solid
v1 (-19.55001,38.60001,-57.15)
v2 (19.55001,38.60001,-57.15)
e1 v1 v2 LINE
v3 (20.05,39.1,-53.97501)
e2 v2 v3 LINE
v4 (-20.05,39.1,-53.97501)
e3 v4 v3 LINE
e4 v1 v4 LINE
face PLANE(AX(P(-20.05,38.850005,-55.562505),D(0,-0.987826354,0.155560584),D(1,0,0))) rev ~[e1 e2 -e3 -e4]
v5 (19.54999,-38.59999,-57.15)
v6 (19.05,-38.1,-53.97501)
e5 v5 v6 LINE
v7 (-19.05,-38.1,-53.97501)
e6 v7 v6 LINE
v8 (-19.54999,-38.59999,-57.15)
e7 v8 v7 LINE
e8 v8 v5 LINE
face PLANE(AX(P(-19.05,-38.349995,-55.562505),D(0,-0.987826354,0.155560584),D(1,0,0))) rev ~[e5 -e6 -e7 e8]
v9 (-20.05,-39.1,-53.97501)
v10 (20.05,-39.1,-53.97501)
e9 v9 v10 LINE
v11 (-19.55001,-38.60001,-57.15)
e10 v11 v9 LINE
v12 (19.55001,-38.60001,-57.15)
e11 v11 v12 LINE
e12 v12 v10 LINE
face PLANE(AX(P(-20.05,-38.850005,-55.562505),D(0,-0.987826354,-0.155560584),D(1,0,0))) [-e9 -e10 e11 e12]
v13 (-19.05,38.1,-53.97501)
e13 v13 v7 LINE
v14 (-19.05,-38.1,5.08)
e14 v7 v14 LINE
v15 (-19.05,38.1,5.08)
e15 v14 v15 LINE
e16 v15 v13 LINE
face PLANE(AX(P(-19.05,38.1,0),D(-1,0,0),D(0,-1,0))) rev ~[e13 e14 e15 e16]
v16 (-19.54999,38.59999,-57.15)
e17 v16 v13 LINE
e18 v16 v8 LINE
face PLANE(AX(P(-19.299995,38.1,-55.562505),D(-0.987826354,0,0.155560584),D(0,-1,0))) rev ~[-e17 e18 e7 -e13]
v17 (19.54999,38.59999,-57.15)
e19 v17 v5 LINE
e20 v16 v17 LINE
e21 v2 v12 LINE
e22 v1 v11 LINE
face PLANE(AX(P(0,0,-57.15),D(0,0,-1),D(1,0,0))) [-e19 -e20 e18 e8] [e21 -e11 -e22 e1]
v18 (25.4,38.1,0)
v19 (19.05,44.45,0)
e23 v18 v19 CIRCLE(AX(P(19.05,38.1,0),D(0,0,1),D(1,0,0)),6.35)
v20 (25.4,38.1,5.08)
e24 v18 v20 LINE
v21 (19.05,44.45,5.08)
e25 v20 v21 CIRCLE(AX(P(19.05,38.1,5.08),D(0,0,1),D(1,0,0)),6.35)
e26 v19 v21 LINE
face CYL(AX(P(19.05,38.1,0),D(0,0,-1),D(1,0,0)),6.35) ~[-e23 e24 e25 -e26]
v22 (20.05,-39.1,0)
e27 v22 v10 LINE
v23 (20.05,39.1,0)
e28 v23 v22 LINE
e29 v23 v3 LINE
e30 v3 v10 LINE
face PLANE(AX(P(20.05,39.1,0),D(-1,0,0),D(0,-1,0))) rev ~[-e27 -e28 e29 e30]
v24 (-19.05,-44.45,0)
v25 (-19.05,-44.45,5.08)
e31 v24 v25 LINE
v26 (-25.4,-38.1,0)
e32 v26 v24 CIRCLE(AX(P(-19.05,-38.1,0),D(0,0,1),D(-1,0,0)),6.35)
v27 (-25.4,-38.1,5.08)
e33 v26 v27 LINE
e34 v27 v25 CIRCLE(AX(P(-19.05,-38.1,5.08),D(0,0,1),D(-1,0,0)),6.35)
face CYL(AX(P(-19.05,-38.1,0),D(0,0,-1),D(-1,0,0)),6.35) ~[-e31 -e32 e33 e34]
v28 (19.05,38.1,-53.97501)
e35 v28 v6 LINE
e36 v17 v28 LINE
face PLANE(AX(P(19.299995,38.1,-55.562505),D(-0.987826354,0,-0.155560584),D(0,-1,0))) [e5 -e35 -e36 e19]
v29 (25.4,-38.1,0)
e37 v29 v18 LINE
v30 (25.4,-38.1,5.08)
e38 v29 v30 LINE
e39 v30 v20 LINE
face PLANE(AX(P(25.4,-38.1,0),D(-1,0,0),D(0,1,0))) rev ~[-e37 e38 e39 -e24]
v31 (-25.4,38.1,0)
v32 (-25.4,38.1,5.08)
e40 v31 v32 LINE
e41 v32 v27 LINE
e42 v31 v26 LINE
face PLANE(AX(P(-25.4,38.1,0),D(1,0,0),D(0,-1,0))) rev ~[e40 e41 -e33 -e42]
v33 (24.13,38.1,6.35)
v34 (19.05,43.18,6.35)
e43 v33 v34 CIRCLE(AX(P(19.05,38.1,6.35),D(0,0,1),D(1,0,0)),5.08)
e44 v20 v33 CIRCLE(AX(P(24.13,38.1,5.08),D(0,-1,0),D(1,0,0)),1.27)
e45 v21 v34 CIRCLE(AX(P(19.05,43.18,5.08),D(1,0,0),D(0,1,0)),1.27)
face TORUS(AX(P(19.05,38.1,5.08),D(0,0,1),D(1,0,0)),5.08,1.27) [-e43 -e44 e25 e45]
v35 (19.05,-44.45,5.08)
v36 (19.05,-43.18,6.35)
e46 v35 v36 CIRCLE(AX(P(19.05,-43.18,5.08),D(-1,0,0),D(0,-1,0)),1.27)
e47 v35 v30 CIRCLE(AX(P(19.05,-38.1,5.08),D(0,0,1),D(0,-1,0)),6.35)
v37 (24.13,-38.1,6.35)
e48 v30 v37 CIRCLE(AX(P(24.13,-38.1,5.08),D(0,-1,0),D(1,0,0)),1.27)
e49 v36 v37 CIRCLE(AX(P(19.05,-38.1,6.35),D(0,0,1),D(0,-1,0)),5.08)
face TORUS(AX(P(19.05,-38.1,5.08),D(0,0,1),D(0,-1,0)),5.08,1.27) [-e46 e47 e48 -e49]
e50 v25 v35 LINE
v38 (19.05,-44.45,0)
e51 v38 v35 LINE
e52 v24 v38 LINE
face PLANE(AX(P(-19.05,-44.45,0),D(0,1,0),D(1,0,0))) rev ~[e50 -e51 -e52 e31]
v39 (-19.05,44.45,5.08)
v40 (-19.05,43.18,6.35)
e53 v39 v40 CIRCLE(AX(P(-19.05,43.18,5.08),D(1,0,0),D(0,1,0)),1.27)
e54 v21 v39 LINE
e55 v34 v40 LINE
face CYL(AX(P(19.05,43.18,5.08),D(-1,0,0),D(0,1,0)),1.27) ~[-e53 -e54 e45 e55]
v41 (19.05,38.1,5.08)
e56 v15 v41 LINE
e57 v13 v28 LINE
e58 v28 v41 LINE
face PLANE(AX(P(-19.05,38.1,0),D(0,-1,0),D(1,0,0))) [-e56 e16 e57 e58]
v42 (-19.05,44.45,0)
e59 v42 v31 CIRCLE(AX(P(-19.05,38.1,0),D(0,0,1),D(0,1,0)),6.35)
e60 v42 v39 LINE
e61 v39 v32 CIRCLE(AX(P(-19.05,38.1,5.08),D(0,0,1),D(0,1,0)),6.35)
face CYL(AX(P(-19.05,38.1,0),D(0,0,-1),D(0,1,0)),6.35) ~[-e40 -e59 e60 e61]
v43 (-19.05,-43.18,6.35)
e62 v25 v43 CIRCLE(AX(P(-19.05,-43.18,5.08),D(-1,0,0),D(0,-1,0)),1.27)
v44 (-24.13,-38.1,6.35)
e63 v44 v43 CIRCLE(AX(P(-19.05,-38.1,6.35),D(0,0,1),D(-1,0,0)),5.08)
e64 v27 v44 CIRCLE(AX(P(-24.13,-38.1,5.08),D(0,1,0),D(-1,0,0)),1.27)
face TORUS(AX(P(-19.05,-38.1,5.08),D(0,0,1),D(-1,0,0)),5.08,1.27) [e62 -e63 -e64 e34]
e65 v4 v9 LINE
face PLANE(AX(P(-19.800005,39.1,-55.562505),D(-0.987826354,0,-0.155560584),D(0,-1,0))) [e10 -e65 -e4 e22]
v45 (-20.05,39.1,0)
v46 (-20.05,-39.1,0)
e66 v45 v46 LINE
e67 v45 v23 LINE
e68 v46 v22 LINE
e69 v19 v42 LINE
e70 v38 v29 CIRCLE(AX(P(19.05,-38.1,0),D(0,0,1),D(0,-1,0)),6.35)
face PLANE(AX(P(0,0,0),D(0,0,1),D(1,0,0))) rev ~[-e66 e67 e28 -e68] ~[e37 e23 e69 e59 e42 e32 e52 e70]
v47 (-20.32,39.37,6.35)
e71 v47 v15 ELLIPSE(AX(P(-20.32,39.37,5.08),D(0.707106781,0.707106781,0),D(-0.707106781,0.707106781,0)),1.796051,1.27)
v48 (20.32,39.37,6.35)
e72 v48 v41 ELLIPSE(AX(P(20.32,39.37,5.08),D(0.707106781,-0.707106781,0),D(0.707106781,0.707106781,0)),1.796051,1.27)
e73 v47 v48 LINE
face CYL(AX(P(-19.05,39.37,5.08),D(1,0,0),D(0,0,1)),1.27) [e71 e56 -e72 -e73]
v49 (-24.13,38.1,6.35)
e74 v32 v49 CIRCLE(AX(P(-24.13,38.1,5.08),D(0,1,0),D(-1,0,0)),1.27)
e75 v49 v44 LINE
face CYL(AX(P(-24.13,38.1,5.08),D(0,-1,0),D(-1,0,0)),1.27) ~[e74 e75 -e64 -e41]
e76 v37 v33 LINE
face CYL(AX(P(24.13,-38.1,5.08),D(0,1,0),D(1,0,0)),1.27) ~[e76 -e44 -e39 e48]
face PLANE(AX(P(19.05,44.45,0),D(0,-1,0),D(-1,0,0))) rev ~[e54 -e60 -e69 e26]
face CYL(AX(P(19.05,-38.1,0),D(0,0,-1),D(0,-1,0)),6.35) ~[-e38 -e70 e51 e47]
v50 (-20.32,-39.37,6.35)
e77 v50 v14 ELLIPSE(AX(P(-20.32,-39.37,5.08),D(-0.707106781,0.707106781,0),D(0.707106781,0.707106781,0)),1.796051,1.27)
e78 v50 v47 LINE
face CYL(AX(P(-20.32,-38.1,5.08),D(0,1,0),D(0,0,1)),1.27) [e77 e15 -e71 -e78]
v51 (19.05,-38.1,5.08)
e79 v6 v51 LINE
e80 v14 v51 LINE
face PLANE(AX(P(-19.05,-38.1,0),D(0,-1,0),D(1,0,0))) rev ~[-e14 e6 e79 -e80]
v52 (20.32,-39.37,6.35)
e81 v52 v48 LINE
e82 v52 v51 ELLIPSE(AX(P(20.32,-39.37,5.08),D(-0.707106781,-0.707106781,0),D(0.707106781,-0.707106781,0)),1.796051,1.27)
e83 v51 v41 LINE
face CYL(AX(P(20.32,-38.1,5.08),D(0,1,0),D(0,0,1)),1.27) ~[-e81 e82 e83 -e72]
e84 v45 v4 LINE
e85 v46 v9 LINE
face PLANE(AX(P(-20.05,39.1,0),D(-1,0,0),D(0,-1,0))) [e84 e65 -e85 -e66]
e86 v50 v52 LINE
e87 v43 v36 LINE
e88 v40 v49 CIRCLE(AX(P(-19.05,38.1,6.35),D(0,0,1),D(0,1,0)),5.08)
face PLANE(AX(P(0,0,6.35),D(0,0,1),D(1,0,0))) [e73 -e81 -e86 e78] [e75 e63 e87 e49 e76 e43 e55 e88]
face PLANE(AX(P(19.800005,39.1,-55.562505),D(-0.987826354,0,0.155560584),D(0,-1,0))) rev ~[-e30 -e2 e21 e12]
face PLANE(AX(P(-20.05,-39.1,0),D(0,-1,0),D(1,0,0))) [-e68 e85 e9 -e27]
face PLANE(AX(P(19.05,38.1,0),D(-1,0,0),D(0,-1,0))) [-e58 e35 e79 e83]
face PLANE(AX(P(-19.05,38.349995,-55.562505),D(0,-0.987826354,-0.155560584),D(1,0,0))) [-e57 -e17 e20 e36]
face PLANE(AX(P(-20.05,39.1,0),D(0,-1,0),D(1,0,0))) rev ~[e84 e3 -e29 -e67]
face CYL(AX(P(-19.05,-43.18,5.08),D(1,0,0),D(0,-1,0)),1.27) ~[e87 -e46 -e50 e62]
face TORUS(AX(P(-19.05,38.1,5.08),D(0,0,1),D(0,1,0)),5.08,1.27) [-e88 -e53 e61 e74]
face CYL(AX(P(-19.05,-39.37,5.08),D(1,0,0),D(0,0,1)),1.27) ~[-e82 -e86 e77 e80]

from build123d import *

# Parameters (mm, degrees)
F0_W     = 40.1
F0_H     = 78.2
F0_W_2   = 38.1
F0_H_2   = 76.2
F1_DEPTH = 6.35
F2_W     = 40.1
F2_H     = 78.2
F2_W_2   = 38.1
F2_H_2   = 76.2
F3_DEPTH = 57.15
F4_SIZE2 = 3.17499
F4_SIZE  = 0.49999
F5_R     = 1.27


# Not quite as in the source:
# - a fillet or chamfer is up to 0.001 mm smaller than in the source, because OpenCascade refuses the exact size


with BuildPart() as f1:
    # F0 (on Top) → F1 (new body)
    with BuildSketch(Plane.XY):
        with BuildLine():
            ThreePointArc((25.4, 38.1), (23.5401280605, 42.5901280605), (19.05, 44.45))
            Line((19.05, 44.45), (-19.05, 44.45))
            ThreePointArc((-19.05, 44.45), (-23.5401280605, 42.5901280605), (-25.4, 38.1))
            Line((-25.4, 38.1), (-25.4, -38.1))
            ThreePointArc((-25.4, -38.1), (-23.5401280605, -42.5901280605), (-19.05, -44.45))
            Line((-19.05, -44.45), (19.05, -44.45))
            ThreePointArc((19.05, -44.45), (23.5401280605, -42.5901280605), (25.4, -38.1))
            Line((25.4, -38.1), (25.4, 38.1))
        make_face()
        Rectangle(F0_W, F0_H, mode=Mode.SUBTRACT)
        Rectangle(F0_W, F0_H)
        Rectangle(F0_W_2, F0_H_2, mode=Mode.SUBTRACT)
    extrude(amount=F1_DEPTH)

    # F2 (on face) → F3 (join)
    with BuildSketch(Plane(origin=(0, 0, 0), x_dir=(1, 0, 0), z_dir=(0, 0, -1))):
        Rectangle(F2_W, F2_H)
        Rectangle(F2_W_2, F2_H_2, mode=Mode.SUBTRACT)
    extrude(amount=F3_DEPTH)

    # F4 (size 0.5 and 3.175 in the source; OpenCascade refuses exactly that, so slightly less here)
    f4_edges = [f1.edges().sort_by_distance(p)[0] for p in [
        (-20.05, 0, -57.15),
        (0, 39.1, -57.15),
        (20.05, 0, -57.15),
        (0, -39.1, -57.15),
        (0, -38.1, -57.15),
        (19.05, 0, -57.15),
        (0, 38.1, -57.15),
        (-19.05, 0, -57.15),
    ]]
    f4_side = f1.faces().sort_by_distance((-19.17118, 0, -57.15))[0]
    chamfer(f4_edges, length=F4_SIZE, length2=F4_SIZE2, reference=f4_side)

    # F5
    f5_edges = [f1.edges().sort_by_distance(p)[0] for p in [
        (23.540128, 42.590128, 6.35),
        (0, 44.45, 6.35),
        (-23.540128, 42.590128, 6.35),
        (-25.4, 0, 6.35),
        (-23.540128, -42.590128, 6.35),
        (0, -44.45, 6.35),
        (23.540128, -42.590128, 6.35),
        (25.4, 0, 6.35),
        (0, -38.1, 6.35),
        (-19.05, 0, 6.35),
        (0, 38.1, 6.35),
        (19.05, 0, 6.35),
    ]]
    fillet(f5_edges, radius=F5_R)


solid = f1.part
